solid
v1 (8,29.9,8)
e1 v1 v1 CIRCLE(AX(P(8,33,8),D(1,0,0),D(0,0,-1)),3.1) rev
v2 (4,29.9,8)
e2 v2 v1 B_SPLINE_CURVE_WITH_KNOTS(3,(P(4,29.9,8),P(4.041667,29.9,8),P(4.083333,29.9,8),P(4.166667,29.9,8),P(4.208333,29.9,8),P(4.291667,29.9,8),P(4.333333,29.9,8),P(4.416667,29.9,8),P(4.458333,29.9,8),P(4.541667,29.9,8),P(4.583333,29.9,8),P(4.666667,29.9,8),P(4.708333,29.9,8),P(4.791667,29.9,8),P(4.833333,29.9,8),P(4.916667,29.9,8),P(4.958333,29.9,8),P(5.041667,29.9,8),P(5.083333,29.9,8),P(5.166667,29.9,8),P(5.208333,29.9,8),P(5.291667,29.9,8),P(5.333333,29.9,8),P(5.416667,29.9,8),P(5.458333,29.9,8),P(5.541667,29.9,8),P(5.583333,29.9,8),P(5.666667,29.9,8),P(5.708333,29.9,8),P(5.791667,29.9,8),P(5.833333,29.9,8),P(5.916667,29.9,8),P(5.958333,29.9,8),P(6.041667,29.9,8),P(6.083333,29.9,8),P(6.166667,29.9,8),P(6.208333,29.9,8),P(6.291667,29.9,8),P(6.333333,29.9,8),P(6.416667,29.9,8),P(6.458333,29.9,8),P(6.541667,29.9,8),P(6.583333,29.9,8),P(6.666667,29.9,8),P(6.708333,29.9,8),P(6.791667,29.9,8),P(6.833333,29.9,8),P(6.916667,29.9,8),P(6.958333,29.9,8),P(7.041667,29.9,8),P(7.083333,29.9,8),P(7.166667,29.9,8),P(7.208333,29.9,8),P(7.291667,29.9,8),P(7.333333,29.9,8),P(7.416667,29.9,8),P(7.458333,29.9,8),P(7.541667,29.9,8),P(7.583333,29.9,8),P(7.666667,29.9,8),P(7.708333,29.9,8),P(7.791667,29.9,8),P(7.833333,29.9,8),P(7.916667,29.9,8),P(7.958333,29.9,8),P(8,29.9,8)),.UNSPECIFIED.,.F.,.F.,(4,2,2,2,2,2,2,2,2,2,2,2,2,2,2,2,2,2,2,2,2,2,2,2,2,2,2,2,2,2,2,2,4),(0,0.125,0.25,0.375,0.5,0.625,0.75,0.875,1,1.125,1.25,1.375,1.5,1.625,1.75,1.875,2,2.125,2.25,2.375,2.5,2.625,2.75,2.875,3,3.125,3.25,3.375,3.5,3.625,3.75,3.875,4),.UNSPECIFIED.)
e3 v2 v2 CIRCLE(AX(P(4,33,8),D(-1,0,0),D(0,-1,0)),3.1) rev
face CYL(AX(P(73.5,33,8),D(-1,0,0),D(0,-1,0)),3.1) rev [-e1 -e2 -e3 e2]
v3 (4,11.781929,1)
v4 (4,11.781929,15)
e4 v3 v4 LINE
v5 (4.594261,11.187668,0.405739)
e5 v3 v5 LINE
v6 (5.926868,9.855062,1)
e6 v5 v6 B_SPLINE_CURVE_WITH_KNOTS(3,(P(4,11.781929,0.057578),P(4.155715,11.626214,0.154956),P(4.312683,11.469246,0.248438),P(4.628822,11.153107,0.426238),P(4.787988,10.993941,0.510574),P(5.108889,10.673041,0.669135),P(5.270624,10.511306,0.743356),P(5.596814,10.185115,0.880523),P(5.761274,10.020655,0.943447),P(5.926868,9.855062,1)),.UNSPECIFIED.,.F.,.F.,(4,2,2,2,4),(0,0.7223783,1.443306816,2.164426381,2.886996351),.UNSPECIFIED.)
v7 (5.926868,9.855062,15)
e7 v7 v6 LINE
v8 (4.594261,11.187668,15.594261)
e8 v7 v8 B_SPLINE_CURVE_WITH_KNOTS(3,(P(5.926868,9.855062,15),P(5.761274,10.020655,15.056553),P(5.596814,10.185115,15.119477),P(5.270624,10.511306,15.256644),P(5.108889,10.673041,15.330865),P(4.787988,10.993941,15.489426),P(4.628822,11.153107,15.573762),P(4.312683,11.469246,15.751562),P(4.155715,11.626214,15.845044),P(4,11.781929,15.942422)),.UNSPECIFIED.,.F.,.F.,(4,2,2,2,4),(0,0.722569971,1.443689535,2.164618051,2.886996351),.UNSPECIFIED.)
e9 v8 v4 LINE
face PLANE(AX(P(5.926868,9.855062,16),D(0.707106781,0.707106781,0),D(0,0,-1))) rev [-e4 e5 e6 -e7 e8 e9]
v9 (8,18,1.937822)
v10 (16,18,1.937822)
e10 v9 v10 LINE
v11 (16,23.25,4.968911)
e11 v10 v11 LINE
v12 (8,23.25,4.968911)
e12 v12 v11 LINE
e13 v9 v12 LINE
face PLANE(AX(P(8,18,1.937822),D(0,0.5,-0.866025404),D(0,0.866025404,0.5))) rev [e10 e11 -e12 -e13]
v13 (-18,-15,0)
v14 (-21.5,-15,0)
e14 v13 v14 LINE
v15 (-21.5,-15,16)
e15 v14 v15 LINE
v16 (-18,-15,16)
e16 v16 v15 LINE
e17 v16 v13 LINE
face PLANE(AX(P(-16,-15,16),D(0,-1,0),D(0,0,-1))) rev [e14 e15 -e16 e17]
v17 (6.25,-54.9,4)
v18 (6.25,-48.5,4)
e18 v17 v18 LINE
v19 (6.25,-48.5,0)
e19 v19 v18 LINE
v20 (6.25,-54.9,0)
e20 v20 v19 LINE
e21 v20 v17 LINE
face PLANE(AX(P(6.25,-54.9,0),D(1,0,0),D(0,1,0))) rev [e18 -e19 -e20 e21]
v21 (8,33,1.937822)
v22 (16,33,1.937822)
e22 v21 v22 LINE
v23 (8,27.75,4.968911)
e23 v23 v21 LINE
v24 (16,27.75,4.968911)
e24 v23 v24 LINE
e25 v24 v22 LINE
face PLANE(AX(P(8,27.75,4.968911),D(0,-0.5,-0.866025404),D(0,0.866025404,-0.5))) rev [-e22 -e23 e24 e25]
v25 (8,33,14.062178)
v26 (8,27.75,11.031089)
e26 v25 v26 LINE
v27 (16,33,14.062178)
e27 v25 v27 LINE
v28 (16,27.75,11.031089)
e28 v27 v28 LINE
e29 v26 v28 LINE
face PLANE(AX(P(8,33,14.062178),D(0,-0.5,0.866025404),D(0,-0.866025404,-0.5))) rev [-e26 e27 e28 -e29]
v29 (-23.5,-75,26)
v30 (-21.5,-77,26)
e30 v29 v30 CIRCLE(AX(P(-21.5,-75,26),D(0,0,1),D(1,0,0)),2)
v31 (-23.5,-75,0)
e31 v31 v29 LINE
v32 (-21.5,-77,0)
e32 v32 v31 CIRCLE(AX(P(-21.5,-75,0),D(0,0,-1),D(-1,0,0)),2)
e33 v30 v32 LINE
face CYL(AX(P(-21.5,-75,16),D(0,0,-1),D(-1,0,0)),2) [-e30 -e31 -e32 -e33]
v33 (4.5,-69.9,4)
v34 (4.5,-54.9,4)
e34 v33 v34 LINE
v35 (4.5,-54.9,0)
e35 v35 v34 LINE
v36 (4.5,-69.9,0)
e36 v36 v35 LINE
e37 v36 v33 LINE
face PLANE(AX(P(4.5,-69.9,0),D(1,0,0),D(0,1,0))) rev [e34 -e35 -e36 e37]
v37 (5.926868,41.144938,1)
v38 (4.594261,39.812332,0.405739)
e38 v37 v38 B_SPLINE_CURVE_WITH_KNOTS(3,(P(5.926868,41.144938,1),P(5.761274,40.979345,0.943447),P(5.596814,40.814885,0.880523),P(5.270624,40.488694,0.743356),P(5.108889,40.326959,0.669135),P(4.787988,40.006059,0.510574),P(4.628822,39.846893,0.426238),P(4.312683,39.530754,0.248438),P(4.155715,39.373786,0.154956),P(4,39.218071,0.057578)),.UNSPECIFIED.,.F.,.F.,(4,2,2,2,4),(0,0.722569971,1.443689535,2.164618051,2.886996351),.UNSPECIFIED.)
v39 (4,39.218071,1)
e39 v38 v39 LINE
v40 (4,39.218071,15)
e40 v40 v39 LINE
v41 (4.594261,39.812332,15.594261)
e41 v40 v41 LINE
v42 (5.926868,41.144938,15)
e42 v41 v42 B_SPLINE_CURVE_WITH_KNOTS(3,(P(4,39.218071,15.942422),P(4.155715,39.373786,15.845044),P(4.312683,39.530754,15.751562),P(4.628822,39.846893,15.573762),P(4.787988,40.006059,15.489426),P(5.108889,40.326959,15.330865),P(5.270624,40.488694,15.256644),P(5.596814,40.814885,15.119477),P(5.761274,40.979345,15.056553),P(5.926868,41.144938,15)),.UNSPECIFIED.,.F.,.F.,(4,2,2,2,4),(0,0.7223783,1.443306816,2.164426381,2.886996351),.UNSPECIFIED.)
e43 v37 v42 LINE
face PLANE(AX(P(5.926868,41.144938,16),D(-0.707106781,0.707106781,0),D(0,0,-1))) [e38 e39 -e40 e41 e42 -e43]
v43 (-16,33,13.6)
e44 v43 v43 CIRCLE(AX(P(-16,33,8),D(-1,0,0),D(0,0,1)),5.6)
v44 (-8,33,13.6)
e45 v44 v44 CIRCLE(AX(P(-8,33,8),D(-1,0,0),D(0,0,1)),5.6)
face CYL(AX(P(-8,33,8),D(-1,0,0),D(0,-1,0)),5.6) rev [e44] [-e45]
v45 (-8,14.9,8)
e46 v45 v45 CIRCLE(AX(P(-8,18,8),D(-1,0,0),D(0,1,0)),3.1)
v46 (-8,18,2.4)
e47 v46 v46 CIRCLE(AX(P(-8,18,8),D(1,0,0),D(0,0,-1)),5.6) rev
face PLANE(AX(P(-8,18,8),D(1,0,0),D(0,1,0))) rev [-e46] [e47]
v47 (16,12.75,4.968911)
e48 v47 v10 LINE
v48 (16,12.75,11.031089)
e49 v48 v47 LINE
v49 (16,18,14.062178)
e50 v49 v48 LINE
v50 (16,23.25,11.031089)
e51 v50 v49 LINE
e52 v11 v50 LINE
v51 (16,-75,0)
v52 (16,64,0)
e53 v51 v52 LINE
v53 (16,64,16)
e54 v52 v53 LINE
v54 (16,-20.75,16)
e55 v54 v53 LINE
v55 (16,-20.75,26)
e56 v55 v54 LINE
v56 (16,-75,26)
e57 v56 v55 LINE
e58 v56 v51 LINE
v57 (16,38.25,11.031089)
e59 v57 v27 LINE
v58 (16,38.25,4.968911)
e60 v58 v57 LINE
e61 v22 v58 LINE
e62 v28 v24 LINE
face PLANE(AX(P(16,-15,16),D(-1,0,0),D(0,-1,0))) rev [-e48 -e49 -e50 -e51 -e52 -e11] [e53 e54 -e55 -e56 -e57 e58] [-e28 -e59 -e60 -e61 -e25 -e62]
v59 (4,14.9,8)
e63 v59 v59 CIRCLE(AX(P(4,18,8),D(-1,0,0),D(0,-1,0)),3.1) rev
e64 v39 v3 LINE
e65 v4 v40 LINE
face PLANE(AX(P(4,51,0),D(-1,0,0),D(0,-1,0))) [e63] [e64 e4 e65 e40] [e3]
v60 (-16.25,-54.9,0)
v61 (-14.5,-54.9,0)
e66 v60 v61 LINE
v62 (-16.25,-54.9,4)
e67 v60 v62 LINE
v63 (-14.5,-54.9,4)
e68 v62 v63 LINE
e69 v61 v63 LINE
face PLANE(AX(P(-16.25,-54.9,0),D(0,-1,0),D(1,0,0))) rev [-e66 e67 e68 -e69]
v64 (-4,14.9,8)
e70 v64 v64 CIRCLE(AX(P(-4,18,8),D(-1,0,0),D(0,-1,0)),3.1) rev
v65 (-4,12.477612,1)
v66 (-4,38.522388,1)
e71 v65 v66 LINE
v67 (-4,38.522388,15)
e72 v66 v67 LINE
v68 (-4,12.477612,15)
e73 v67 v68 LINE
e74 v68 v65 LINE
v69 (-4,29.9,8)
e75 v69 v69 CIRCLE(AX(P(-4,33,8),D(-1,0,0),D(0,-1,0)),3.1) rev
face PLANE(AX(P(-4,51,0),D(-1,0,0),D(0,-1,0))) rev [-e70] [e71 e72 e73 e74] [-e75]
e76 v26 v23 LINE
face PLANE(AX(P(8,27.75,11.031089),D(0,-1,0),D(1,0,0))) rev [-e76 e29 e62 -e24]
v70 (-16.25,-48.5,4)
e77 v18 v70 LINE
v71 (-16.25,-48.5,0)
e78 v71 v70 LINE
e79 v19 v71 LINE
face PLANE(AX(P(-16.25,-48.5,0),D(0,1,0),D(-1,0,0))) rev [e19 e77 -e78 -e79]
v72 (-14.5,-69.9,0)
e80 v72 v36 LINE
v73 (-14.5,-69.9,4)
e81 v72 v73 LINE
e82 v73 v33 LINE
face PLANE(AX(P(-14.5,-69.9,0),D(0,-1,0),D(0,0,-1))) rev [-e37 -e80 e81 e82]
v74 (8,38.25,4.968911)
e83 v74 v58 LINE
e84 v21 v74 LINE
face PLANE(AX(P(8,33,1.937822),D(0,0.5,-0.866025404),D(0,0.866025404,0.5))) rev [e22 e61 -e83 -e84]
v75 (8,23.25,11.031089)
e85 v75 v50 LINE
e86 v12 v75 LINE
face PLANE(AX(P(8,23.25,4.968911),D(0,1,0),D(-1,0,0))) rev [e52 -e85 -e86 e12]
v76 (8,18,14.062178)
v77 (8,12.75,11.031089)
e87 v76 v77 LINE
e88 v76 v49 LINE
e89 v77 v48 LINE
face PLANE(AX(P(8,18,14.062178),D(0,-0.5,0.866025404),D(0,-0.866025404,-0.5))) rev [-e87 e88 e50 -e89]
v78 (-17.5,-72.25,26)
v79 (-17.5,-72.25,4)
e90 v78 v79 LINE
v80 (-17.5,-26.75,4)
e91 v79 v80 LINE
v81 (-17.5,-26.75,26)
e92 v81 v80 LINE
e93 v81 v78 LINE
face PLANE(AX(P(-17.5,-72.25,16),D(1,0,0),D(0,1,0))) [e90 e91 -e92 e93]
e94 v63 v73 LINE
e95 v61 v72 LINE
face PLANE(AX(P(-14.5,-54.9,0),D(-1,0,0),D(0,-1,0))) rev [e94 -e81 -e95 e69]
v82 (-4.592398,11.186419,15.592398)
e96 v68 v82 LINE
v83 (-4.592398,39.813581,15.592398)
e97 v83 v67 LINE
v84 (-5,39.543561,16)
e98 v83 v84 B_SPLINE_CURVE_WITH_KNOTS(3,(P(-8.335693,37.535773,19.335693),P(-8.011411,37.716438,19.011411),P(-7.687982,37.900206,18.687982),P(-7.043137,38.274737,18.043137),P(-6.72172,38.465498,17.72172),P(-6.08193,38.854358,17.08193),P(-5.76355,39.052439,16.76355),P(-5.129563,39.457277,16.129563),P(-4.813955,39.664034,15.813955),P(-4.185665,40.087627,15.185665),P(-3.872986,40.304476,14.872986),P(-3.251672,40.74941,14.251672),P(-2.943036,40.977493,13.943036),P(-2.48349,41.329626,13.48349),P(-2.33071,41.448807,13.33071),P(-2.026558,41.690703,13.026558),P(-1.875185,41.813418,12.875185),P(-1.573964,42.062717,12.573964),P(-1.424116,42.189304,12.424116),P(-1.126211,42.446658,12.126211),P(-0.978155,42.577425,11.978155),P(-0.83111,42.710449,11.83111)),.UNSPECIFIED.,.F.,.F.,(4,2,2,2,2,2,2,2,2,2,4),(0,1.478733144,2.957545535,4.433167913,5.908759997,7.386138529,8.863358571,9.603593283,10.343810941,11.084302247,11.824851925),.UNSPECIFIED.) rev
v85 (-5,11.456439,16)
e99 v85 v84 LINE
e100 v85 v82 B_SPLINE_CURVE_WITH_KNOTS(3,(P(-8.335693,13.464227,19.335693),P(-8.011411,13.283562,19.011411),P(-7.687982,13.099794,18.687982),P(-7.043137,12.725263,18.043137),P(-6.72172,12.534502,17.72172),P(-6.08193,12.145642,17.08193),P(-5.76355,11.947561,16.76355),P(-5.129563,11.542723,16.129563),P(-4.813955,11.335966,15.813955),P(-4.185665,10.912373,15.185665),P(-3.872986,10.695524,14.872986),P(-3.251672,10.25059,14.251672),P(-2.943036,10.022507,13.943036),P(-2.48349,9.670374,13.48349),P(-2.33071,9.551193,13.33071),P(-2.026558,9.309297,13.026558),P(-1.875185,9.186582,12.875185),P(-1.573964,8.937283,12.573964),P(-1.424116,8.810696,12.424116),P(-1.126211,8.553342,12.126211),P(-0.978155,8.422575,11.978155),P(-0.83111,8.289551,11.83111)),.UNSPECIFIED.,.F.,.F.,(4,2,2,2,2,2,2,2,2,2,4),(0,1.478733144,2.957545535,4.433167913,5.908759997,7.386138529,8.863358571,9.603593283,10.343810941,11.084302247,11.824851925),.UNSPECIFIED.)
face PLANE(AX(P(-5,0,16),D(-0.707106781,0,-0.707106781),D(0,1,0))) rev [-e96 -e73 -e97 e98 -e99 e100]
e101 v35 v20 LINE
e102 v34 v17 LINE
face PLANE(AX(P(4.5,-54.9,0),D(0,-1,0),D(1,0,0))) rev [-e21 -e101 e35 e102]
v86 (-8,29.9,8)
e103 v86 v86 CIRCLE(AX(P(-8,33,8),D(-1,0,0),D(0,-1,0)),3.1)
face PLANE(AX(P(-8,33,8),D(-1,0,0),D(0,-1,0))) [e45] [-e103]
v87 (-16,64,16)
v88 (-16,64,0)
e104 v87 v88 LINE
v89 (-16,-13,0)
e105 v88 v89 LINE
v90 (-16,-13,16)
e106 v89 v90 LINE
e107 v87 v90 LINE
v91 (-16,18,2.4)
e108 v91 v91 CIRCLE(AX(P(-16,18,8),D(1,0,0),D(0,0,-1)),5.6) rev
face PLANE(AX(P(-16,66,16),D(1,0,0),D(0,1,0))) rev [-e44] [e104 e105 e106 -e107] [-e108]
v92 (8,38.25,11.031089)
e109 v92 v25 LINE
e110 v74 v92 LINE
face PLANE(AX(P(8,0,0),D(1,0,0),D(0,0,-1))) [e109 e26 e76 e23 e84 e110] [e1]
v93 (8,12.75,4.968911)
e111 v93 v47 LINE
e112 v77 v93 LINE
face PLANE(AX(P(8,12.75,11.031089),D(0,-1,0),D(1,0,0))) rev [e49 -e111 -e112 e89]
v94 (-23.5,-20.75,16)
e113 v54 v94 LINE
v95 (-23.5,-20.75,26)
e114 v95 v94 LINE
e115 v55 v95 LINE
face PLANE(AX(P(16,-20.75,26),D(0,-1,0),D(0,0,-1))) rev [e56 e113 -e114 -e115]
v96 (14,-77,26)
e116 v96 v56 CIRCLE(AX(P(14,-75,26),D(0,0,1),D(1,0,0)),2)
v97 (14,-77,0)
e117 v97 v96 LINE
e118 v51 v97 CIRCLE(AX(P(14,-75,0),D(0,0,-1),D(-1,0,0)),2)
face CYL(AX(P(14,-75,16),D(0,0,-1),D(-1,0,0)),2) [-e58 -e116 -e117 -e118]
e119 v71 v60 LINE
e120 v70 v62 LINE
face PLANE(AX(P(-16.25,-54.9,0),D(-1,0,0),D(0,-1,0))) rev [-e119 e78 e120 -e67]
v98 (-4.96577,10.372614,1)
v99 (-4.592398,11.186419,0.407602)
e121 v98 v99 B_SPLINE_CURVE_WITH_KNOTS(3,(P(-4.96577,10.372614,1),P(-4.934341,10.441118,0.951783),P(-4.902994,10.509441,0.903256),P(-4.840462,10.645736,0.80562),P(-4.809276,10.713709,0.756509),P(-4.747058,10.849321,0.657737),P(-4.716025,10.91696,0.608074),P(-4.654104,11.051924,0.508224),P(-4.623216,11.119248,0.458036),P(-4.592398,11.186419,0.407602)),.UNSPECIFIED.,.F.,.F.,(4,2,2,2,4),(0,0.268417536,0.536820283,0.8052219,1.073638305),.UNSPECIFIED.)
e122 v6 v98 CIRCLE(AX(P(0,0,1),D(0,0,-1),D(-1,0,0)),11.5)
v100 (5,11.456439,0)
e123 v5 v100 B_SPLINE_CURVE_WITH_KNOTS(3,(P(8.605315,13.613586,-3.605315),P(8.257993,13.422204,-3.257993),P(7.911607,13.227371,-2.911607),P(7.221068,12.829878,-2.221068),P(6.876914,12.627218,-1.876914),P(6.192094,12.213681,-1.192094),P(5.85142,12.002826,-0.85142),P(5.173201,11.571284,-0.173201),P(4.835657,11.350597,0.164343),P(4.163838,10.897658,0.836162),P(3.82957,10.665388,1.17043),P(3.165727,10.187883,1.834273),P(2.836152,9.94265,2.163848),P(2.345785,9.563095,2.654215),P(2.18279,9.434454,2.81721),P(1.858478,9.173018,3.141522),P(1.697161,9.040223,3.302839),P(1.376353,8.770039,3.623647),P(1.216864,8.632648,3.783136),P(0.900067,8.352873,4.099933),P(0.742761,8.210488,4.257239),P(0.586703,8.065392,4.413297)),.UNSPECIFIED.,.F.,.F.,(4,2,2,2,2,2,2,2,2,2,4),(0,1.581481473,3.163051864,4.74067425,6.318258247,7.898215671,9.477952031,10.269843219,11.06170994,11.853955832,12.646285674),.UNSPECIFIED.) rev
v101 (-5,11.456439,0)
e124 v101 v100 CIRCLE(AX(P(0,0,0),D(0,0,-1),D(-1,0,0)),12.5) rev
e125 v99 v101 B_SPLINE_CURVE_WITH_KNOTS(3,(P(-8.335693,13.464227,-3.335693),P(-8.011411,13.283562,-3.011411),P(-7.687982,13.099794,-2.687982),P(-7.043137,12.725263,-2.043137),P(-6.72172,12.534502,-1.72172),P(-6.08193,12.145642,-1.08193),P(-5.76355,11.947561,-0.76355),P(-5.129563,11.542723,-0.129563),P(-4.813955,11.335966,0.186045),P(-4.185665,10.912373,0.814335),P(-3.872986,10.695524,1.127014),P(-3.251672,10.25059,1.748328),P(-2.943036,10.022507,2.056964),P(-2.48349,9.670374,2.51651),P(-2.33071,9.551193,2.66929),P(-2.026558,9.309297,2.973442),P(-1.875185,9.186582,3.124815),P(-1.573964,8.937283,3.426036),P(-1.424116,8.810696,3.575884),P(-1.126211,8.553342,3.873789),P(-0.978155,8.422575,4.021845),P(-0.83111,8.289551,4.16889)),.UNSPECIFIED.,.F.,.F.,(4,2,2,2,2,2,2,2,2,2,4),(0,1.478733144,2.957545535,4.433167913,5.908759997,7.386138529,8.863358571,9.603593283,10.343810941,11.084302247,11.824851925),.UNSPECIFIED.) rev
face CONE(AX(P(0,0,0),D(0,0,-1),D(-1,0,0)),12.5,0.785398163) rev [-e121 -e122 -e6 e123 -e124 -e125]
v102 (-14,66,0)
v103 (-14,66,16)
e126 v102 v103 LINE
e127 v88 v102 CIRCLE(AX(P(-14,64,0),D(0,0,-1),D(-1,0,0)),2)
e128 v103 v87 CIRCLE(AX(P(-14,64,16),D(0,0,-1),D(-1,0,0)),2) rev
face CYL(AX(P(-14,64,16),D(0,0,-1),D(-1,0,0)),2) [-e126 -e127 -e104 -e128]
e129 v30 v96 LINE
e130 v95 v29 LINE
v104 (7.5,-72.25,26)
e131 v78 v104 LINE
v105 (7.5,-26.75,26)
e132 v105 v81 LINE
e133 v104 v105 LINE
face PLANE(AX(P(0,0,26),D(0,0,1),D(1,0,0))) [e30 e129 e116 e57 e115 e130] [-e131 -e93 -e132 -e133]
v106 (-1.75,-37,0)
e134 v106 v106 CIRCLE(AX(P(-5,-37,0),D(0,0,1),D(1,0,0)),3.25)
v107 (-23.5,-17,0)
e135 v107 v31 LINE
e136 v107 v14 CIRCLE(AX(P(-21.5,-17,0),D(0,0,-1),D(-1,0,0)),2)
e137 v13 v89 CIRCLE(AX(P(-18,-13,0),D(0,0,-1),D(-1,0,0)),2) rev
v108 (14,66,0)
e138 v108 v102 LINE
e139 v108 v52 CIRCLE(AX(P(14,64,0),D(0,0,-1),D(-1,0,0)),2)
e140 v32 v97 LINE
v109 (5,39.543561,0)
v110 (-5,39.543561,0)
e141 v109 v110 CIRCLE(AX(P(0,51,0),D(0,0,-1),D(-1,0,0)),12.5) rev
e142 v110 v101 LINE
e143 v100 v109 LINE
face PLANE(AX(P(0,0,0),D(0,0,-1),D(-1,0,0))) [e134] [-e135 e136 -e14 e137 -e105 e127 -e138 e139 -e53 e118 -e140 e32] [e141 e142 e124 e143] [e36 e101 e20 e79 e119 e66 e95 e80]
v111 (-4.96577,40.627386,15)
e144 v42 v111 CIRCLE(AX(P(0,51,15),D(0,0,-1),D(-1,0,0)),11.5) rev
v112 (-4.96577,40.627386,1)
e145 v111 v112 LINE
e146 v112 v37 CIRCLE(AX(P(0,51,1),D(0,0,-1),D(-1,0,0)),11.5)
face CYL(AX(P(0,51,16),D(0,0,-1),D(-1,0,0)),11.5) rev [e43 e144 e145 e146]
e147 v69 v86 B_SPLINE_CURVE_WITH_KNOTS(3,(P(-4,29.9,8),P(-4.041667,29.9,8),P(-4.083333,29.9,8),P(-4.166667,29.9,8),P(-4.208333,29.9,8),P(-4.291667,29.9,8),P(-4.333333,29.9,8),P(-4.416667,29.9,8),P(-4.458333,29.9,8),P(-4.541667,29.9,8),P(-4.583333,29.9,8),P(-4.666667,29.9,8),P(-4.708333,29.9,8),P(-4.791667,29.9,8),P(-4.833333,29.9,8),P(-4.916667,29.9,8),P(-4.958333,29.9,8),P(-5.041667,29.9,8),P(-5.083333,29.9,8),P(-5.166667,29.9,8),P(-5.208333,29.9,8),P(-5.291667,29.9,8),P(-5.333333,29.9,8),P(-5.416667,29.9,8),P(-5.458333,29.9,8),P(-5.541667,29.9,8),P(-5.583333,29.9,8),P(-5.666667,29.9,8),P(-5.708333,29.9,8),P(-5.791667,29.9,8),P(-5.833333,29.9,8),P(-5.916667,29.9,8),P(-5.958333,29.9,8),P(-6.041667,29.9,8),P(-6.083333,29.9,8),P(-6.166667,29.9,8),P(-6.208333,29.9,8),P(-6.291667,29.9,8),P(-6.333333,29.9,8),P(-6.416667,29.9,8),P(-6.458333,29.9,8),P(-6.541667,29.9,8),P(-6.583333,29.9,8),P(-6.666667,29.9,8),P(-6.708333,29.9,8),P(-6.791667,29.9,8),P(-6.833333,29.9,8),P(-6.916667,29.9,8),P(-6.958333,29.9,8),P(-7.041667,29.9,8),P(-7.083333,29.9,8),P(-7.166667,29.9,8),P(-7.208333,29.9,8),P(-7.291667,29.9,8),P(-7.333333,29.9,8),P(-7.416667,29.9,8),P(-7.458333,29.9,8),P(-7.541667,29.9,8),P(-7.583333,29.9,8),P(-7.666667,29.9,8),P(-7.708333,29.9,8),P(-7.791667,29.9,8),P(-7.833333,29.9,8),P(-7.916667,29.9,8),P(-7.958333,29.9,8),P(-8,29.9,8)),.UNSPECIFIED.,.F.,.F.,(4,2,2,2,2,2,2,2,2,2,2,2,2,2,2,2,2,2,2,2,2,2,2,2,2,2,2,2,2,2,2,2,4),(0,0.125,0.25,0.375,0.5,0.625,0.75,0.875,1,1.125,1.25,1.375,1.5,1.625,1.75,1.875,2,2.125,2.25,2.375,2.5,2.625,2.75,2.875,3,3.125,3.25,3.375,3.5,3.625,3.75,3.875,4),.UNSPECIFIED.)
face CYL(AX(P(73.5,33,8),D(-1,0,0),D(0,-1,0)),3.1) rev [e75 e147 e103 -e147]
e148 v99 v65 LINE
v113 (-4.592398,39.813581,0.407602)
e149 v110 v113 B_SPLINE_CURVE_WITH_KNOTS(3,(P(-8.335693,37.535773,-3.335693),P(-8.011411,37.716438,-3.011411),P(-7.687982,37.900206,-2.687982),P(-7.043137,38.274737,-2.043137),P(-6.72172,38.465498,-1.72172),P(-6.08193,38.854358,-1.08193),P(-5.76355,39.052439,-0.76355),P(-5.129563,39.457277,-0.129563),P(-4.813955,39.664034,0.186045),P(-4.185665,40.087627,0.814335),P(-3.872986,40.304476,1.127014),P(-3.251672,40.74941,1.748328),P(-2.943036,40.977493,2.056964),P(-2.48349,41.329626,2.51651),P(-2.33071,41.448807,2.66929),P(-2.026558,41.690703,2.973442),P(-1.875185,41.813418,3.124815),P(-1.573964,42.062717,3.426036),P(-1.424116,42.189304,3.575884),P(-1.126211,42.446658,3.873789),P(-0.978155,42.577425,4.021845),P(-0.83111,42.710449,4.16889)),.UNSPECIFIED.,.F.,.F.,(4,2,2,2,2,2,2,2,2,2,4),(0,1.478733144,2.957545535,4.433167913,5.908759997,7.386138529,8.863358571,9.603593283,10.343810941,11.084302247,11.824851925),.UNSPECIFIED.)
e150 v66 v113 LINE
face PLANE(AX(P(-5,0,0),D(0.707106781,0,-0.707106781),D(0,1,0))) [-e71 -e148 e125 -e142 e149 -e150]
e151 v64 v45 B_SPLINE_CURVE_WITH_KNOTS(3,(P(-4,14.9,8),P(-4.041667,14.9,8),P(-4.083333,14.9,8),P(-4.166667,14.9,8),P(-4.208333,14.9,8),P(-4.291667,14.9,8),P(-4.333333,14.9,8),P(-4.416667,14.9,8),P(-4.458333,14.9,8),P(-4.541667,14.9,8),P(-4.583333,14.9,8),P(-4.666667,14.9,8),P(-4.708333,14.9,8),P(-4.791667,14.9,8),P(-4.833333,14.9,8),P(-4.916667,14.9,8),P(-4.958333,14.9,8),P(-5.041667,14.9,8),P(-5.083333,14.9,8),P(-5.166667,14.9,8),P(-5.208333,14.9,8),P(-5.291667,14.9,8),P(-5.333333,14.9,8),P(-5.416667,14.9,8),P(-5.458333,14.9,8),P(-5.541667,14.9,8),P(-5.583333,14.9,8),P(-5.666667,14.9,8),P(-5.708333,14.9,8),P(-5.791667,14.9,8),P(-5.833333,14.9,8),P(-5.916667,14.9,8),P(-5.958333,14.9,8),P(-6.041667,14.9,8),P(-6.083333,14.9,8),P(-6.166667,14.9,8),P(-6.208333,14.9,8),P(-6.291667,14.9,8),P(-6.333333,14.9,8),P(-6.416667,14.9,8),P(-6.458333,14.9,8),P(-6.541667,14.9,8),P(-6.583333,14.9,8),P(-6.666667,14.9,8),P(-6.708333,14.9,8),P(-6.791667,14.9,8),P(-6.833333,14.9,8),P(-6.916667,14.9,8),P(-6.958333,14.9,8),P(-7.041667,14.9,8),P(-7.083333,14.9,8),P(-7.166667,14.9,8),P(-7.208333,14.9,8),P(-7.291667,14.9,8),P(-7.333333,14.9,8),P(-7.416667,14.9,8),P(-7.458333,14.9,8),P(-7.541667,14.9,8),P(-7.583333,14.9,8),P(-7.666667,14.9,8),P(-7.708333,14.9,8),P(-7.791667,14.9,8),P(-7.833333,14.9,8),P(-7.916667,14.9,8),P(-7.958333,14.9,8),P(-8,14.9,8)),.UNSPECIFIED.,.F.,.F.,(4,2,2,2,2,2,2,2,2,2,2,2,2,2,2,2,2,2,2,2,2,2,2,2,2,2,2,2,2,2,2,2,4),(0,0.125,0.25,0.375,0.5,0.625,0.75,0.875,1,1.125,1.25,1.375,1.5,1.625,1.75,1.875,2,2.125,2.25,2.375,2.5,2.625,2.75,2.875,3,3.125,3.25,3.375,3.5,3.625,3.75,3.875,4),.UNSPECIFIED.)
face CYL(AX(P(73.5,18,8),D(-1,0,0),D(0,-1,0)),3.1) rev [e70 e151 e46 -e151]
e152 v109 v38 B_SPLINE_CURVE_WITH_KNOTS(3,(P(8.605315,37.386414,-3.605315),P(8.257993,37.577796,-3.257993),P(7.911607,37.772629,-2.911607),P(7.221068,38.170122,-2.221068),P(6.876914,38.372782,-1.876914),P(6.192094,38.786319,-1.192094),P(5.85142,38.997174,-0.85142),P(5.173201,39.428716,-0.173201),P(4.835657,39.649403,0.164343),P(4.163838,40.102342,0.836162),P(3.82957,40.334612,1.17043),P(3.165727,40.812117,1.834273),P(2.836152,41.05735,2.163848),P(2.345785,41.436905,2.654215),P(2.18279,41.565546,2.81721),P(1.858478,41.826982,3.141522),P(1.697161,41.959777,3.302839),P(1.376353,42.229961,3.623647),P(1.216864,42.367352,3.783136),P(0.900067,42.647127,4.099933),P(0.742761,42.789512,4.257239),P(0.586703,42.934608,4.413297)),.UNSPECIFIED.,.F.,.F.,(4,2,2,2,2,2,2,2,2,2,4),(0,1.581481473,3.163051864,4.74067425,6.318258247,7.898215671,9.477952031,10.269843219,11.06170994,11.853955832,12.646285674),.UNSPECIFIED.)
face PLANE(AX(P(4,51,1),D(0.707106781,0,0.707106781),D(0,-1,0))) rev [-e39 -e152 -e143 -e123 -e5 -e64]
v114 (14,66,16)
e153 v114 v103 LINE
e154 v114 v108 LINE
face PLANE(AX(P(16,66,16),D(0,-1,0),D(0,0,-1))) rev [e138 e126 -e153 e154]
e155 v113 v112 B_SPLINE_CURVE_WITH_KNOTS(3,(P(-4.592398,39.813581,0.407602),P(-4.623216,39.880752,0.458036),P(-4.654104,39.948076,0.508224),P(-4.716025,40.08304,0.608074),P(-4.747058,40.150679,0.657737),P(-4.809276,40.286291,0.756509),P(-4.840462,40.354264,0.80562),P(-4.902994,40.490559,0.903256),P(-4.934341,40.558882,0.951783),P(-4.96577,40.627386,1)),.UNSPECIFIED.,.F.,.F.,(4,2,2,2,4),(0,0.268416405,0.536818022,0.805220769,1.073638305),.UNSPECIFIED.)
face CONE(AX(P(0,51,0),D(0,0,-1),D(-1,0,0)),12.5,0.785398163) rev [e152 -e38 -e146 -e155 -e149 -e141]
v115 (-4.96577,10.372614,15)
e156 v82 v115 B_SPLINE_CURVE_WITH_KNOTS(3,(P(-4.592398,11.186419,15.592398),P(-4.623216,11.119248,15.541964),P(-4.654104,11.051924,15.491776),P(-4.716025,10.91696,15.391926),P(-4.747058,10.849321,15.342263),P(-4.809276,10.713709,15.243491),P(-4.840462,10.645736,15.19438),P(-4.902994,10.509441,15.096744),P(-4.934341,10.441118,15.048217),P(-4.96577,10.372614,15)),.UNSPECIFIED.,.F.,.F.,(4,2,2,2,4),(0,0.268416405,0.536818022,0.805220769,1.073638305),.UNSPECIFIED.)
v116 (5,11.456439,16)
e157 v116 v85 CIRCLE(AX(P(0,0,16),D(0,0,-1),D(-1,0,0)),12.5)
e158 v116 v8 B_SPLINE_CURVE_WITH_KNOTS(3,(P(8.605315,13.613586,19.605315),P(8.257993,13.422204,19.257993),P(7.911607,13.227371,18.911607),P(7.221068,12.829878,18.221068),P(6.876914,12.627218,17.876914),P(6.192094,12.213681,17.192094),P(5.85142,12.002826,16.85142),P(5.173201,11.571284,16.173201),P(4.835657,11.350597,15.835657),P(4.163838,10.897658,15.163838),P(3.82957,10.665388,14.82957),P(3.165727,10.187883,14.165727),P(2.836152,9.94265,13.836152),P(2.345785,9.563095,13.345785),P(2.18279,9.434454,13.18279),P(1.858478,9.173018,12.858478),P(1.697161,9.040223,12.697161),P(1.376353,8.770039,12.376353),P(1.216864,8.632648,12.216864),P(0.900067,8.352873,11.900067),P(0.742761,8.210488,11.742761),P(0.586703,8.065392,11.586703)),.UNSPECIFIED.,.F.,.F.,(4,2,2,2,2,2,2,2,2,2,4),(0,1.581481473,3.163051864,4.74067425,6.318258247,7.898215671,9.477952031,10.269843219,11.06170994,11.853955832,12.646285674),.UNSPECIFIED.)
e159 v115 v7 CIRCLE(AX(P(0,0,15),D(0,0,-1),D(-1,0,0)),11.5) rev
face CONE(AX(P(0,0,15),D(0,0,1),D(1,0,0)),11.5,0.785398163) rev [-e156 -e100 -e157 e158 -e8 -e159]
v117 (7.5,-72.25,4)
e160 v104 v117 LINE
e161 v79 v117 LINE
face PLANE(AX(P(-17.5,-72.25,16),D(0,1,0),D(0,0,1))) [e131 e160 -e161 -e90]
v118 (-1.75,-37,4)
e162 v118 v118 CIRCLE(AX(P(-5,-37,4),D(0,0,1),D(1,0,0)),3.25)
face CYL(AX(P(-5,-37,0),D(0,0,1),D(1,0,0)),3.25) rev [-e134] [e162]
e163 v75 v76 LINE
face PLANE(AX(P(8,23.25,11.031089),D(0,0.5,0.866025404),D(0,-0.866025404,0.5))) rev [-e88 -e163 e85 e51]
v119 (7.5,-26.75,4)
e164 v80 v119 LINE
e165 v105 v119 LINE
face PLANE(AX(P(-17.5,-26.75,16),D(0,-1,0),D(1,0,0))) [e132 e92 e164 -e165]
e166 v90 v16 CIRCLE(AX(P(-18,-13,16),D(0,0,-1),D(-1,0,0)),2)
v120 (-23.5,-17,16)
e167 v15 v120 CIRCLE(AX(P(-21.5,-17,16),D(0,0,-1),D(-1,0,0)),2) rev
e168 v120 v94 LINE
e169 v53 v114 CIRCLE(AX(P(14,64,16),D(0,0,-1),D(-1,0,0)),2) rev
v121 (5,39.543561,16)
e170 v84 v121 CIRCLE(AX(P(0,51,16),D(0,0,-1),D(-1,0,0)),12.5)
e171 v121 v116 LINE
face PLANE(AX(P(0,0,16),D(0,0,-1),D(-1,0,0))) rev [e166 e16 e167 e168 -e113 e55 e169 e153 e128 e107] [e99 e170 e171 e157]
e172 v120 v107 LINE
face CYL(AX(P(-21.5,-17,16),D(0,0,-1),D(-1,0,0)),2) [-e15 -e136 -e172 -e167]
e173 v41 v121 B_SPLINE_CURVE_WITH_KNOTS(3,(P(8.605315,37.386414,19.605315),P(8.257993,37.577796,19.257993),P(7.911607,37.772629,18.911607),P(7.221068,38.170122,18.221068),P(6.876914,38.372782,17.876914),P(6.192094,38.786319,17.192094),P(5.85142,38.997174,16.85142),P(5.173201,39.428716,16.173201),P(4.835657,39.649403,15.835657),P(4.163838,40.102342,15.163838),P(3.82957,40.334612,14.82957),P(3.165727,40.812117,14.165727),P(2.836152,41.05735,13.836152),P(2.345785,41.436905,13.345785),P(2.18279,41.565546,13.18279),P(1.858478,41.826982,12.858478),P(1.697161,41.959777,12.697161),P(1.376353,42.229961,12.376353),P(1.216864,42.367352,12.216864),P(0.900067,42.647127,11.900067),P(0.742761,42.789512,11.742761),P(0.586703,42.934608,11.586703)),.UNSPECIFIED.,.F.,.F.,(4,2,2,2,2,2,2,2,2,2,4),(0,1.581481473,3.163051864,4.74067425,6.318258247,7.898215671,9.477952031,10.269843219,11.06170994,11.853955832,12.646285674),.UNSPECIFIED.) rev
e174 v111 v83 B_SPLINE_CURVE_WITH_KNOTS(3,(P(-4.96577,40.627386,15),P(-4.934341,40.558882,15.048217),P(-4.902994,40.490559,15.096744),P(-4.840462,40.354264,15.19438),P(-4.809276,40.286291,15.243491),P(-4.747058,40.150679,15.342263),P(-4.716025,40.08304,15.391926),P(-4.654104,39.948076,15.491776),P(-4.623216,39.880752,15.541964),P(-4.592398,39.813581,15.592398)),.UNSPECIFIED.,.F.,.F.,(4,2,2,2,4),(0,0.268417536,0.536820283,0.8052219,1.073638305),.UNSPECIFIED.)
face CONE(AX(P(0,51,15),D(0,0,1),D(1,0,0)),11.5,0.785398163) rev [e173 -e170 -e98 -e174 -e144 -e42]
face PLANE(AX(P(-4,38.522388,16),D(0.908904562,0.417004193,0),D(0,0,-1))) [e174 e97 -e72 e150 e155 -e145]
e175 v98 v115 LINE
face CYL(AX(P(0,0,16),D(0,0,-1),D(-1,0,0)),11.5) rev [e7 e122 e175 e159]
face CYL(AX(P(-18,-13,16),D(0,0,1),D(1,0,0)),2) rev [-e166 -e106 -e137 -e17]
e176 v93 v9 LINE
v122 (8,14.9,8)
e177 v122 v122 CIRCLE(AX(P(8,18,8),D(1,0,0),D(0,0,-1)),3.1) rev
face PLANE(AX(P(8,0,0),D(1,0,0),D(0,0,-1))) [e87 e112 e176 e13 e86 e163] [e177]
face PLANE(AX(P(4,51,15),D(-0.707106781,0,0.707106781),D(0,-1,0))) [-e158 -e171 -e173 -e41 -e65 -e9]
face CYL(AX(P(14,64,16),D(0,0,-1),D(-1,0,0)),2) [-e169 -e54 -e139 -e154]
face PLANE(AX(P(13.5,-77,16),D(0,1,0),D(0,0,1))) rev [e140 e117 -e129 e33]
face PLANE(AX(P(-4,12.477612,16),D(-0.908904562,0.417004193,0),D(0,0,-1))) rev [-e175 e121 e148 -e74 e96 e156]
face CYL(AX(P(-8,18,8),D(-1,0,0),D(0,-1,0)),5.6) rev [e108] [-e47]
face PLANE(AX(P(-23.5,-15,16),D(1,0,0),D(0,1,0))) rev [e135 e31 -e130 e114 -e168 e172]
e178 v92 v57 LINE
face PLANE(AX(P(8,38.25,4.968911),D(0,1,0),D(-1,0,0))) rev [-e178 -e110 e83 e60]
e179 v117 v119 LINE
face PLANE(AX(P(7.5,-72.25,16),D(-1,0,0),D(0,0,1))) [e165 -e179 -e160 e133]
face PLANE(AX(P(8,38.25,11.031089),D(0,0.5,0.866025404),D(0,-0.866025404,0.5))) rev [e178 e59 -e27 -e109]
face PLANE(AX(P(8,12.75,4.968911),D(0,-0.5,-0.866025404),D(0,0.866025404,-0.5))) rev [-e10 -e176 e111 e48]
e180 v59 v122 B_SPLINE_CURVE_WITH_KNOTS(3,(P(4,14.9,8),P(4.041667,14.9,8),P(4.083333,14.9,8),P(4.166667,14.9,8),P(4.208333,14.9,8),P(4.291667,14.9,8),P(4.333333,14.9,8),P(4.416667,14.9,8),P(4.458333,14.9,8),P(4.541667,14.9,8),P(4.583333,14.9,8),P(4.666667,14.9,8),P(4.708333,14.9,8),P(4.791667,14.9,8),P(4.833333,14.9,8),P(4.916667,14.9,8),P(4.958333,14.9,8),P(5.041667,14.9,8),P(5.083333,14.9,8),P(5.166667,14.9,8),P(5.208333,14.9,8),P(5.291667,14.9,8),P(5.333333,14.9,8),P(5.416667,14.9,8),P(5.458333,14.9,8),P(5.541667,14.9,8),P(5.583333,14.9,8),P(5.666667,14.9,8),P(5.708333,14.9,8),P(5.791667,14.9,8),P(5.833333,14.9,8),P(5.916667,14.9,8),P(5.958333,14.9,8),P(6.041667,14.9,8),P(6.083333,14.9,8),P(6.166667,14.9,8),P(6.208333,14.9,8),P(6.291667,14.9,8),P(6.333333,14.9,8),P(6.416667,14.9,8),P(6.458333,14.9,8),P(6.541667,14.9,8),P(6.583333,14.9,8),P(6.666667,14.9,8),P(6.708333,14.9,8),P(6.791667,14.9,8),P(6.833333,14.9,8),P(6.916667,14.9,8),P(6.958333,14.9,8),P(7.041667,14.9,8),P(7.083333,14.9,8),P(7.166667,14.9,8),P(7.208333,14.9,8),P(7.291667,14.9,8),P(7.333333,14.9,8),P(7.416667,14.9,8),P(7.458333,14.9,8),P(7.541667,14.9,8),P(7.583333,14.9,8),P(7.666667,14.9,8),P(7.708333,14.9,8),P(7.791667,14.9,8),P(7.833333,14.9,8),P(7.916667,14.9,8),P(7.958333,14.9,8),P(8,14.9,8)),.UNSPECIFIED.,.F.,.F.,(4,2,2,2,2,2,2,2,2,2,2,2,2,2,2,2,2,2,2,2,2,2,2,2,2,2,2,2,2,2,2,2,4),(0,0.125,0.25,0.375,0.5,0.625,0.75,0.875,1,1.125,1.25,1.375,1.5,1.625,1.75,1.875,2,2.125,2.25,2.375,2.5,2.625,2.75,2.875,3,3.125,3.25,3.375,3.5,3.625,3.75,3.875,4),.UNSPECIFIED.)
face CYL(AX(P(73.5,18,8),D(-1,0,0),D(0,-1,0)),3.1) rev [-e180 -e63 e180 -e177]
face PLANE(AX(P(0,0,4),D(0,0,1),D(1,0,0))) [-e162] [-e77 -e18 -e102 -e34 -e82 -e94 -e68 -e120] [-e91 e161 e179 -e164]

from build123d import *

# Parameters (mm, degrees)
SKETCH_1_R               = 11.5
SKETCH_1_W               = 25
SKETCH_1_H               = 45.5
EXTRUDE_1_DEPTH          = 16
SKETCH_2_R               = 3.1
CUT_EXTRUDE_1_DEPTH      = 120.143820654
SKETCH_2_2_R             = 5.6
SKETCH_2_2_R_2           = 3.1
CUT_EXTRUDE_1_2_DEPTH    = 8
CUT_EXTRUDE_2_DEPTH      = 108.64408948
CUT_EXTRUDE_2_DEPTH_BACK = 108.64408948
SKETCH_3_W               = 8
SKETCH_3_H               = 51
CUT_EXTRUDE_2_2_DEPTH    = 8
CHAMFER_1_SIZE           = 1.695682666
CHAMFER_1_SIZE_2         = 1
SKETCH_1_2_W             = 25
SKETCH_1_2_H             = 45.5
EXTRUDE_2_DEPTH          = 4
SKETCH_6_R               = 3.25
CUT_EXTRUDE_3_DEPTH      = 108.122593322
SKETCH_7_W               = 39.5
SKETCH_7_H               = 56.25
SKETCH_7_W_2             = 25
SKETCH_7_H_2             = 45.5
SKETCH_7_W_3             = 37
EXTRUDE_3_DEPTH          = 10
FILLET_1_R               = 2
CHAMFER_2_SIZE           = 1
CHAMFER_3_SIZE           = 25
CUT_EXTRUDE_4_DEPTH      = 108.64408948
CUT_EXTRUDE_4_DEPTH_BACK = 108.64408948
SKETCH_8_W               = 71.361850602
SKETCH_8_H               = 94.902741324
FILLET_2_R               = 2


with BuildPart() as part:
    # 草图1 → 凸台-拉伸1 (new body)
    with BuildSketch(Plane.XY):
        Polygon((16, 66), (-16, 66), (-16, -15), (-23.5, -15), (-23.5, -77), (13.5, -77), (73.5, -77), (73.5, -15), (16, -15), align=None)
        with Locations((0, 51)):
            Circle(SKETCH_1_R, mode=Mode.SUBTRACT)
        Circle(SKETCH_1_R, mode=Mode.SUBTRACT)
        with Locations((-5, -49.5)):
            Rectangle(SKETCH_1_W, SKETCH_1_H, mode=Mode.SUBTRACT)
        with Locations((55, -49.5)):
            Rectangle(SKETCH_1_W, SKETCH_1_H, mode=Mode.SUBTRACT)
    extrude(amount=EXTRUDE_1_DEPTH)

    # 草图2 → Cut-Extrude 1 (cut, through all)
    with BuildSketch(Plane.ZY.offset(16)):
        with Locations(Location((8, 33, 0), (0, 0, 270))):
            Circle(SKETCH_2_R)
        with Locations(Location((8, 18, 0), (0, 0, 270))):
            Circle(SKETCH_2_R)
    extrude(amount=-CUT_EXTRUDE_1_DEPTH, mode=Mode.SUBTRACT)

    # 草图2<2> → Cut-Extrude 1 2 (cut)
    # profile 1 of 2: a face of its own
    with BuildSketch(Plane.ZY.offset(16)):
        with Locations((8, 33)):
            Circle(SKETCH_2_2_R)
        with Locations((8, 33)):
            Circle(SKETCH_2_2_R_2, mode=Mode.SUBTRACT)
    # profile 2 of 2: a face of its own
    with BuildSketch(Plane.ZY.offset(16)):
        with Locations((8, 18)):
            Circle(SKETCH_2_2_R)
        with Locations((8, 18)):
            Circle(SKETCH_2_2_R_2, mode=Mode.SUBTRACT)
    extrude(amount=-CUT_EXTRUDE_1_2_DEPTH, mode=Mode.SUBTRACT)

    # 草图3 → Cut-Extrude 2 (cut, two sides: drawn at the far end of the back side and taken through both)
    with BuildSketch(Plane.XY.offset(16).offset(-CUT_EXTRUDE_2_DEPTH_BACK)):
        with Locations((0, 25.5)):
            Rectangle(SKETCH_3_W, SKETCH_3_H)
    extrude(amount=CUT_EXTRUDE_2_DEPTH + CUT_EXTRUDE_2_DEPTH_BACK, mode=Mode.SUBTRACT)

    # 草图4 → Cut-Extrude 2 2 (cut)
    with BuildSketch(Plane(origin=(16, 0, 0), x_dir=(0, 0, -1), z_dir=(1, 0, 0))):
        Polygon((-1.937822174, 33), (-4.968911087, 38.25), (-11.031088913, 38.25), (-14.062177826, 33), (-11.031088913, 27.75), (-4.968911087, 27.75), align=None)
        Polygon((-1.937822174, 18), (-4.968911087, 23.25), (-11.031088913, 23.25), (-14.062177826, 18), (-11.031088913, 12.75), (-4.968911087, 12.75), align=None)
    extrude(amount=-CUT_EXTRUDE_2_2_DEPTH, mode=Mode.SUBTRACT)

    # 倒角1
    # the kernel refuses this chamfer: 1.695682666, 1 mm, written as the material it takes off along each edge
    with BuildSketch(Plane(origin=(-4, 40.218070674, 20.393897044), x_dir=(0, -1, 0), z_dir=(0, 0, -1))) as chamfer_1_piece_1:
        with BuildLine():
            Line((CHAMFER_1_SIZE, 0), (-0.409315042, 0.965770122))
            ThreePointArc((-0.409315042, 0.965770122), (-0.203470382, 0.51067693), (0, 0))
            Line((0, 0), (CHAMFER_1_SIZE, 0))
        make_face()
    extrude(amount=24.787794087, mode=Mode.SUBTRACT)
    with BuildSketch(Plane(origin=(-4, 10.781929326, 20.393897044), x_dir=(0, 1, 0), z_dir=(0, 0, -1))) as chamfer_1_piece_2:
        with BuildLine():
            Line((CHAMFER_1_SIZE, 0), (-0.409315042, -0.965770122))
            ThreePointArc((-0.409315042, -0.965770122), (-0.203470382, -0.51067693), (0, 0))
            Line((0, 0), (CHAMFER_1_SIZE, 0))
        make_face()
    extrude(amount=24.787794087, mode=Mode.SUBTRACT)
    with BuildSketch(Plane(origin=(4, 40.218070674, 21.505815426), x_dir=(0.9011630930702207, 0.4334801952663038, 0), z_dir=(0, 0, -1))) as chamfer_1_piece_3:
        with BuildLine():
            Line((2.138200915, 0), (-CHAMFER_1_SIZE_2 * 0.433480195266, CHAMFER_1_SIZE_2 * 0.90116309307))
            Line((-CHAMFER_1_SIZE_2 * 0.433480195266, CHAMFER_1_SIZE_2 * 0.90116309307), (0, 0))
            ThreePointArc((0, 0), (1.101276568, 0.049757425), (2.138200915, 0))
        make_face()
    extrude(amount=27.011630851, mode=Mode.SUBTRACT)
    with BuildSketch(Plane(origin=(4, 10.781929326, 21.505815426), x_dir=(0, 1, 0), z_dir=(0, 0, -1))) as chamfer_1_piece_4:
        with BuildLine():
            Line((CHAMFER_1_SIZE_2, 0), (-0.92686775, 1.92686775))
            ThreePointArc((-0.92686775, 1.92686775), (-0.432542027, 1.013998656), (0, 0))
            Line((0, 0), (CHAMFER_1_SIZE_2, 0))
        make_face()
    extrude(amount=27.011630851, mode=Mode.SUBTRACT)

    # 草图1<2> → 凸台-拉伸2 (add)
    with BuildSketch(Plane.XY):
        with Locations((-5, -49.5)):
            Rectangle(SKETCH_1_2_W, SKETCH_1_2_H)
        with Locations((55, -49.5)):
            Rectangle(SKETCH_1_2_W, SKETCH_1_2_H)
    extrude(amount=EXTRUDE_2_DEPTH)

    # 草图6 → 切除-拉伸3 (cut, through all)
    with BuildSketch(Plane.XY.offset(4)):
        with Locations((-5, -37)):
            Circle(SKETCH_6_R)
        with Locations((55, -37)):
            Circle(SKETCH_6_R)
        Polygon((-16.25, -54.9), (-14.5, -54.9), (-14.5, -69.9), (4.5, -69.9), (4.5, -54.9), (6.25, -54.9), (6.25, -48.5), (-16.25, -48.5), align=None)
        Polygon((45.5, -54.9), (43.75, -54.9), (43.75, -48.5), (66.25, -48.5), (66.25, -54.9), (64.5, -54.9), (64.5, -69.9), (45.5, -69.9), align=None)
    extrude(amount=-CUT_EXTRUDE_3_DEPTH, mode=Mode.SUBTRACT)

    # 草图7 → 凸台-拉伸3 (add)
    # profile 1 of 2: a face of its own
    with BuildSketch(Plane.XY.offset(16)):
        with Locations((-3.75, -48.875)):
            Rectangle(SKETCH_7_W, SKETCH_7_H)
        with Locations((-5, -49.5)):
            Rectangle(SKETCH_7_W_2, SKETCH_7_H_2, mode=Mode.SUBTRACT)
    # profile 2 of 2: a face of its own
    with BuildSketch(Plane.XY.offset(16)):
        with Locations((55, -48.875)):
            Rectangle(SKETCH_7_W_3, SKETCH_7_H)
        with Locations((55, -49.5)):
            Rectangle(SKETCH_7_W_2, SKETCH_7_H_2, mode=Mode.SUBTRACT)
    extrude(amount=EXTRUDE_3_DEPTH)

    # 圆角1
    fillet_1_edges = [part.edges().sort_by_distance(p)[0] for p in [
        (-16, 66, 8),
        (16, 66, 8),
        (73.5, -15, 8),
        (73.5, -77, 13),
        (-23.5, -77, 13),
        (-23.5, -15, 8),
        (-16, -15, 8),
    ]]
    fillet(fillet_1_edges, radius=FILLET_1_R)

    # 倒角2
    # the kernel refuses this chamfer: 1 mm, written as the material it takes off along each edge
    with BuildSketch(Plane(origin=(-4, 9.905929004, 16), x_dir=(-1, 0, 0), z_dir=(0, 1, 0))) as chamfer_2_piece_1:
        Polygon((CHAMFER_2_SIZE, 0), (0, -CHAMFER_2_SIZE), (0, 0), align=None)
    extrude(amount=31.188141991, mode=Mode.SUBTRACT)
    with BuildSketch(Plane(origin=(-4, 9.905929004, 0), x_dir=(-1, 0, 0), z_dir=(0, 1, 0))) as chamfer_2_piece_2:
        Polygon((CHAMFER_2_SIZE, 0), (0, CHAMFER_2_SIZE), (0, 0), align=None)
    extrude(amount=31.188141991, mode=Mode.SUBTRACT)
    with BuildSketch(Plane(origin=(0, 0, 16), x_dir=(0.15887239859298968, 0.9872991243616649, 0), z_dir=(-0.9872991243616649, 0.15887239859298968, 0))) as chamfer_2_piece_3:
        Polygon((11.5 + CHAMFER_2_SIZE, 0), (11.5, CHAMFER_2_SIZE), (11.5, 0), align=None)
    revolve(axis=Axis((0, 0, 16), (0, 0, -1)), revolution_arc=338.147720881, mode=Mode.SUBTRACT)
    with BuildSketch(Plane(origin=(0, 0, 0), x_dir=(-0.22003054145636358, 0.9754929834839509, 0), z_dir=(0.9754929834839509, 0.22003054145636358, 0))) as chamfer_2_piece_4:
        Polygon((11.5 + CHAMFER_2_SIZE, 0), (11.5, CHAMFER_2_SIZE), (11.5, 0), align=None)
    revolve(axis=Axis((0, 0, 0), (0, 0, 1)), revolution_arc=338.147720881, mode=Mode.SUBTRACT)
    with BuildSketch(Plane(origin=(4, 41.789753662, 16), x_dir=(1, 0, 0), z_dir=(0, -1, 0))) as chamfer_2_piece_5:
        Polygon((CHAMFER_2_SIZE, 0), (0, -CHAMFER_2_SIZE), (0, 0), align=None)
    extrude(amount=32.579507323, mode=Mode.SUBTRACT)
    with BuildSketch(Plane(origin=(4, 41.789753662, 0), x_dir=(1, 0, 0), z_dir=(0, -1, 0))) as chamfer_2_piece_6:
        Polygon((CHAMFER_2_SIZE, 0), (0, CHAMFER_2_SIZE), (0, 0), align=None)
    extrude(amount=32.579507323, mode=Mode.SUBTRACT)
    with BuildSketch(Plane(origin=(0, 51, 0), x_dir=(0.15887239859295355, -0.9872991243616707, 0), z_dir=(-0.9872991243616707, -0.15887239859295355, 0))) as chamfer_2_piece_7:
        Polygon((11.5 + CHAMFER_2_SIZE, 0), (11.5, CHAMFER_2_SIZE), (11.5, 0), align=None)
    revolve(axis=Axis((0, 51, 0), (0, 0, 1)), revolution_arc=338.147720881, mode=Mode.SUBTRACT)
    with BuildSketch(Plane(origin=(0, 51, 16), x_dir=(-0.2200305414563642, -0.9754929834839506, 0), z_dir=(0.9754929834839506, -0.2200305414563642, 0))) as chamfer_2_piece_8:
        Polygon((11.5 + CHAMFER_2_SIZE, 0), (11.5, CHAMFER_2_SIZE), (11.5, 0), align=None)
    revolve(axis=Axis((0, 51, 16), (0, 0, -1)), revolution_arc=338.147720881, mode=Mode.SUBTRACT)

    # 倒角3
    chamfer_3_edges = [part.edges().sort_by_distance(p)[0] for p in [
        (16, -15, 8),
    ]]
    chamfer(chamfer_3_edges, length=CHAMFER_3_SIZE)

    # 草图8 → 切除-拉伸4 (cut, two sides: drawn at the far end of the back side and taken through both)
    with BuildSketch(Plane.XY.offset(16).offset(-CUT_EXTRUDE_4_DEPTH_BACK)):
        with Locations((51.680925301, -37.451370662)):
            Rectangle(SKETCH_8_W, SKETCH_8_H)
    extrude(amount=CUT_EXTRUDE_4_DEPTH + CUT_EXTRUDE_4_DEPTH_BACK, mode=Mode.SUBTRACT)

    # 圆角2
    fillet_2_edges = [part.edges().sort_by_distance(p)[0] for p in [
        (16, -77, 13),
    ]]
    fillet(fillet_2_edges, radius=FILLET_2_R)


solid = part.part
